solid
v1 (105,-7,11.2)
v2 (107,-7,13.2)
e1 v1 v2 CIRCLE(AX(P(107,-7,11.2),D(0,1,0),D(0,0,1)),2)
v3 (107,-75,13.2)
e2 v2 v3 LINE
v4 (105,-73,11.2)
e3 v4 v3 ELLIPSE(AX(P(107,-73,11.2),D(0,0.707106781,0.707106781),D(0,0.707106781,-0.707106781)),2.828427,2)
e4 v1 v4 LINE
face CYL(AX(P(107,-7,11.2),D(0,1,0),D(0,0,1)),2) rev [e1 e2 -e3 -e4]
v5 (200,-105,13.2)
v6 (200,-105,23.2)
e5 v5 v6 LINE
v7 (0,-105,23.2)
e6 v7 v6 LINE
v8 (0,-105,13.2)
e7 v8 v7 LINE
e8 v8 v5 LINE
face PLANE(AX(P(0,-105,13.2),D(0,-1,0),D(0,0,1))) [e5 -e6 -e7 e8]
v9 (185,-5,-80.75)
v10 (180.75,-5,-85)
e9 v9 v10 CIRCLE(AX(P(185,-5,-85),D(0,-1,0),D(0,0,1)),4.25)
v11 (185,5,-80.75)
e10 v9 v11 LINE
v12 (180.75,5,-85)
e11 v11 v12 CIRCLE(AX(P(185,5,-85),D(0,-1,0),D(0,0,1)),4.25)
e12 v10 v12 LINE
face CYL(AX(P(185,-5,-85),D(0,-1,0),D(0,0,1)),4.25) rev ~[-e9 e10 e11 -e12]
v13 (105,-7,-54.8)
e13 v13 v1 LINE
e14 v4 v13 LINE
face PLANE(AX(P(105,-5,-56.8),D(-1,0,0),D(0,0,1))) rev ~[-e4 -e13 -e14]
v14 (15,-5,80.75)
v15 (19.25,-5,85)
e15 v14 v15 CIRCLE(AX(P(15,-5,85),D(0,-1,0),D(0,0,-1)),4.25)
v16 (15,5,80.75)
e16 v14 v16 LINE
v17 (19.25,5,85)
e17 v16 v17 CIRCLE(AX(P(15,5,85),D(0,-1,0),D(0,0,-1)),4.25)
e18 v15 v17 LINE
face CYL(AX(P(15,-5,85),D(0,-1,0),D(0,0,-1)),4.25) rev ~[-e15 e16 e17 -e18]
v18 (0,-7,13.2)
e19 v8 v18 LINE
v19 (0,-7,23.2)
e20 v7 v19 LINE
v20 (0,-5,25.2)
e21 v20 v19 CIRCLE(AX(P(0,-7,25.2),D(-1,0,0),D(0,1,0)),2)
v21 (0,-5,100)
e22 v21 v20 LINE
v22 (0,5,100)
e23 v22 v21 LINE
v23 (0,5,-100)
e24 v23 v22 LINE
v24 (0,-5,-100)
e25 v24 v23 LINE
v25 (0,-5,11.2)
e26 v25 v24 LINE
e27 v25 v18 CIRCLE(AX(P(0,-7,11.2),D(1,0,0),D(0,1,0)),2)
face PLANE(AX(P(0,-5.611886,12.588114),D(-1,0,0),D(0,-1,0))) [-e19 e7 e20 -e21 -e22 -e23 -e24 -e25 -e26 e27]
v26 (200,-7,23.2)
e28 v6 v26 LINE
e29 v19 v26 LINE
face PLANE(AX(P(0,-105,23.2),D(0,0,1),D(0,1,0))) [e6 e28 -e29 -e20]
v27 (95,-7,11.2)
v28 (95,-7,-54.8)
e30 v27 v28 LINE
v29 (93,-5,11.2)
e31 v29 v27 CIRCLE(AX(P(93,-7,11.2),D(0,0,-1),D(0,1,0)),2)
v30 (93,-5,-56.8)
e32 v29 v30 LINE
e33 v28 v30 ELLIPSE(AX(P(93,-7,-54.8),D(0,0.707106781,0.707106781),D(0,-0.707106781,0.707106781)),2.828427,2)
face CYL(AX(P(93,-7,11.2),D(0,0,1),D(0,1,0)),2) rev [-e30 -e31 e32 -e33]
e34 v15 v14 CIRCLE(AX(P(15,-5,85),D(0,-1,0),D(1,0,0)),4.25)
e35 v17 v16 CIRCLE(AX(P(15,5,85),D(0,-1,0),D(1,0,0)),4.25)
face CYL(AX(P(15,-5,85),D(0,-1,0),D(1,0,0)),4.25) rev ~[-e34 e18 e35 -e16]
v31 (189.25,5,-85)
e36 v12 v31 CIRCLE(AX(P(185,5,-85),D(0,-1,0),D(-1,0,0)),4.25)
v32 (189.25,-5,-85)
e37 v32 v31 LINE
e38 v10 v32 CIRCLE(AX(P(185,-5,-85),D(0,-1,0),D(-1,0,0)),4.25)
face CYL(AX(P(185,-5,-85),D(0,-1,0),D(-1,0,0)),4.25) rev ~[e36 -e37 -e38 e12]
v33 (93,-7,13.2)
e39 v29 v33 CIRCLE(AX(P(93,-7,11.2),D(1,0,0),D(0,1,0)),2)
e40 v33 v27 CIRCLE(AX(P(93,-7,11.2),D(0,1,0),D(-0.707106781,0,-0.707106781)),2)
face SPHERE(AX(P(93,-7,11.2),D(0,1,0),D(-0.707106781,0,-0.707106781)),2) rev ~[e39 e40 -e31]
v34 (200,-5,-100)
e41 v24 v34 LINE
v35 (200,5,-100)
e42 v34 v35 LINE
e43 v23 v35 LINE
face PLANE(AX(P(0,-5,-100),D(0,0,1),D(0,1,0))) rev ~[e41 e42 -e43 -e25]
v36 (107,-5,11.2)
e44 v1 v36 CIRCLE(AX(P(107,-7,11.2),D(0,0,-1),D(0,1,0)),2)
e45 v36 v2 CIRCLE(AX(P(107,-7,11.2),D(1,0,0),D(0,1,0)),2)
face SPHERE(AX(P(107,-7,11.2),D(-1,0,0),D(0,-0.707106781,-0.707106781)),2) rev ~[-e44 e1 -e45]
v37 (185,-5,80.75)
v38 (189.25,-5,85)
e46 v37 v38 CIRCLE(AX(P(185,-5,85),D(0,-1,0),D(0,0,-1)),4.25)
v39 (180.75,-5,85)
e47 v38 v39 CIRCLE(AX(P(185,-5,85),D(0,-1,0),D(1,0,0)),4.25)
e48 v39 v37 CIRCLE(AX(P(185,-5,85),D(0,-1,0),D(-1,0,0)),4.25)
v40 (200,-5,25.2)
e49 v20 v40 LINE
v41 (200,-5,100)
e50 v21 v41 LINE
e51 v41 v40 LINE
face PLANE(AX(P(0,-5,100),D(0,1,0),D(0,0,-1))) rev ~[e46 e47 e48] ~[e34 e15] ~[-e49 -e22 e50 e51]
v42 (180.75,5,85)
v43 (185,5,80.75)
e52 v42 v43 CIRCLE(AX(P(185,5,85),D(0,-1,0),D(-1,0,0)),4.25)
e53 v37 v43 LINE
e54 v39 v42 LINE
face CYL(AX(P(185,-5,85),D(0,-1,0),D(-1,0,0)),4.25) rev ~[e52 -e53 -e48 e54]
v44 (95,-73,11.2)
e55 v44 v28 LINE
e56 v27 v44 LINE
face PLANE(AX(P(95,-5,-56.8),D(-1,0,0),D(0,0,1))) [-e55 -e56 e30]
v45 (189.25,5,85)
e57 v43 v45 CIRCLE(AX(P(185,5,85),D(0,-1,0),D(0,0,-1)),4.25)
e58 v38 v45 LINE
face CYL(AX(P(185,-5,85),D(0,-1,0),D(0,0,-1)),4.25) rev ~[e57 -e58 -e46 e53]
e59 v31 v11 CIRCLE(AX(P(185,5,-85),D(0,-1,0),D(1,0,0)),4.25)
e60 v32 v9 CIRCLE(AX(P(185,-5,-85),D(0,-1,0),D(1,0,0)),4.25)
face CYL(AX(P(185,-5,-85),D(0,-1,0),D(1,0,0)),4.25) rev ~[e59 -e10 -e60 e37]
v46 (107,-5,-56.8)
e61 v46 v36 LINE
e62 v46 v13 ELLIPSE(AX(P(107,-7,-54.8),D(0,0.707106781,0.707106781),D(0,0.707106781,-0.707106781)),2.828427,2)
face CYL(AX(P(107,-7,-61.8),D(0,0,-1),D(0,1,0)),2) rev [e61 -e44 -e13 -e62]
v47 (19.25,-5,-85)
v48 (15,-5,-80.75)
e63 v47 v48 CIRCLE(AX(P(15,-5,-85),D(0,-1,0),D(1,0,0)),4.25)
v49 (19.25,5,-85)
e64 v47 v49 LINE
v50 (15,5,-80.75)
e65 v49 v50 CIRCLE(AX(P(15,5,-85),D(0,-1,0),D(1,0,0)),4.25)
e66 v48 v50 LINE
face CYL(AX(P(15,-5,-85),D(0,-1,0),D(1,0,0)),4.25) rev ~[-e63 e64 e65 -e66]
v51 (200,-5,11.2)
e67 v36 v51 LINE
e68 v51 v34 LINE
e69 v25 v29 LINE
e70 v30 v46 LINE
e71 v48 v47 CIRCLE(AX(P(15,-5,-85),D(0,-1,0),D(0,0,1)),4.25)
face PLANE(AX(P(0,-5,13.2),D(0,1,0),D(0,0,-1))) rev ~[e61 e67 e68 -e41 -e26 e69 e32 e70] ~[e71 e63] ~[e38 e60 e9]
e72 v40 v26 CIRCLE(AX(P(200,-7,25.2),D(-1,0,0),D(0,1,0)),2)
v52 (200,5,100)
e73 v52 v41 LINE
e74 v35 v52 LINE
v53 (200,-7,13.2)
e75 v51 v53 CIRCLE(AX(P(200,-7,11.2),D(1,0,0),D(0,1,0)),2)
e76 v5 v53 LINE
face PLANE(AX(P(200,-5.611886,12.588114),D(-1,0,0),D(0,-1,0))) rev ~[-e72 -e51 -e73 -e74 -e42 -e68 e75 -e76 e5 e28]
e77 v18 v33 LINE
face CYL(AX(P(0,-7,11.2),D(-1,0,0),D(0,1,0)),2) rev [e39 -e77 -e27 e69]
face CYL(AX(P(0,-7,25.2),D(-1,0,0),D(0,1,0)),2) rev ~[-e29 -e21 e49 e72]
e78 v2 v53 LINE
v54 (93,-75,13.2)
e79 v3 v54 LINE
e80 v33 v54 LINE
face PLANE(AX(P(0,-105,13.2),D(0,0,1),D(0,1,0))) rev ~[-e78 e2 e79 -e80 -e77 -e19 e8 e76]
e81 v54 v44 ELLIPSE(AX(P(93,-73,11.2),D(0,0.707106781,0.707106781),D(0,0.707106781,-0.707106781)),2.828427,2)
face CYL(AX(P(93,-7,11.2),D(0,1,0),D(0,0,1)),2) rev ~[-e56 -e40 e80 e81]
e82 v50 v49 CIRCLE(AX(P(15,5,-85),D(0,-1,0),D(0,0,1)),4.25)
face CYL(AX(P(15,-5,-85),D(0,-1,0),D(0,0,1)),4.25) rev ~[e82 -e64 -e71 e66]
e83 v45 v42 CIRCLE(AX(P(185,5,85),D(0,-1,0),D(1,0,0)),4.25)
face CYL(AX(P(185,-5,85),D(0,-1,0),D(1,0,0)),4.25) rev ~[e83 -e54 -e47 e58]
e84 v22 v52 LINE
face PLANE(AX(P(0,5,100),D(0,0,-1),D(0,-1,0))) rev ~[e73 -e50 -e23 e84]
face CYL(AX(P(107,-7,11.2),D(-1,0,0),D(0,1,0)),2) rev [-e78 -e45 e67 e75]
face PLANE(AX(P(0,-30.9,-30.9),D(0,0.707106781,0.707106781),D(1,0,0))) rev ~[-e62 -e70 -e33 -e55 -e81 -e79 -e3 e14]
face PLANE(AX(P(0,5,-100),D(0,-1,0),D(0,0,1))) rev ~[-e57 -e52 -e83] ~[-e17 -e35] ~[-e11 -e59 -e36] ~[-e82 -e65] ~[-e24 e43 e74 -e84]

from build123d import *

# Parameters (mm, degrees)
F0_W         = 100
F0_H         = 10
F1_DEPTH     = 200
F2_W         = 10
F2_H         = 70
F3_DEPTH     = 70
F5_DEPTH     = 70
F7_DEPTH     = 20
F8_T1_DEPTH  = 200
F8_T3_DEPTH  = 93
F8_T5_DEPTH  = 93
F8_S9_W      = 2
F8_S9_H      = 2
F8_T10_DEPTH = 2
F8_S15_W     = 2
F8_S15_H     = 2
F8_T16_DEPTH = 2
F8_T22_DEPTH = 73
F8_T27_DEPTH = 73
F8_T32_DEPTH = 73
F8_T37_DEPTH = 73


# Not quite as in the source:
# - a fillet or chamfer that OpenCascade refuses, or shapes differently, is made with other operations: its cross-section is extruded or revolved along the edge and cut away or added


with BuildPart() as f1:
    # F0 (on Right) → F1 (new body)
    with BuildSketch(Plane.YZ):
        Polygon((5, -100), (5, 100), (-5, 100), (-5, 23.2), (-5, 13.2), (-5, -100), align=None)
        with Locations((-55, 18.2)):
            Rectangle(F0_W, F0_H)
    extrude(amount=F1_DEPTH)

    # F2 (on face) → F3 (join)
    with BuildSketch(Plane.XZ.offset(5)):
        with Locations((100, -21.8)):
            Rectangle(F2_W, F2_H)
    extrude(amount=F3_DEPTH)

    # F4 (on face) → F5 (cut)
    with BuildSketch(Plane(origin=(95, 0, 0), x_dir=(0, -1, 0), z_dir=(-1, 0, 0))):
        Polygon((75, -56.8), (75, 13.2), (5, -56.8), align=None)
    extrude(amount=-F5_DEPTH, mode=Mode.SUBTRACT)

    # F6 (on face) → F7 (cut)
    with BuildSketch(Plane.XZ.offset(5)):
        with BuildLine():
            Line((15, 80.75), (15, 85))
            Line((15, 85), (19.25, 85))
            ThreePointArc((19.25, 85), (11.99479618, 88.00520382), (15, 80.75))
        make_face()
        with BuildLine():
            Line((19.25, 85), (15, 85))
            Line((15, 85), (15, 80.75))
            ThreePointArc((15, 80.75), (18.00520382, 81.99479618), (19.25, 85))
        make_face()
        with BuildLine():
            ThreePointArc((189.25, 85), (185, 89.25), (180.75, 85))
            Line((180.75, 85), (185, 85))
            Line((185, 85), (185, 80.75))
            ThreePointArc((185, 80.75), (188.00520382, 81.99479618), (189.25, 85))
        make_face()
        with BuildLine():
            Line((185, 85), (180.75, 85))
            ThreePointArc((180.75, 85), (181.99479618, 81.99479618), (185, 80.75))
            Line((185, 80.75), (185, 85))
        make_face()
        with BuildLine():
            ThreePointArc((189.25, -85), (188.00520382, -81.99479618), (185, -80.75))
            Line((185, -80.75), (185, -85))
            Line((185, -85), (180.75, -85))
            ThreePointArc((180.75, -85), (185, -89.25), (189.25, -85))
        make_face()
        with BuildLine():
            Line((185, -85), (185, -80.75))
            ThreePointArc((185, -80.75), (181.99479618, -81.99479618), (180.75, -85))
            Line((180.75, -85), (185, -85))
        make_face()
        with BuildLine():
            Line((15, -85), (15, -80.75))
            ThreePointArc((15, -80.75), (11.99479618, -88.00520382), (19.25, -85))
            Line((19.25, -85), (15, -85))
        make_face()
        with BuildLine():
            ThreePointArc((19.25, -85), (18.00520382, -81.99479618), (15, -80.75))
            Line((15, -80.75), (15, -85))
            Line((15, -85), (19.25, -85))
        make_face()
    extrude(amount=-F7_DEPTH, mode=Mode.SUBTRACT)

    # F8: fillet of radius 2 on 7 edges, made by hand

    # F8_s2 → F8_t1 (join)
    with BuildSketch(Plane.YZ):
        with BuildLine():
            ThreePointArc((-5, 25.2), (-5.5857864376, 23.7857864376), (-7, 23.2))
            Line((-7, 23.2), (-5, 23.2))
            Line((-5, 23.2), (-5, 25.2))
        make_face()
    extrude(amount=F8_T1_DEPTH)

    # F8_s4 → F8_t3 (join)
    with BuildSketch(Plane.YZ):
        with BuildLine():
            ThreePointArc((-5, 11.2), (-5.5857864376, 12.6142135624), (-7, 13.2))
            Line((-7, 13.2), (-5, 13.2))
            Line((-5, 13.2), (-5, 11.2))
        make_face()
    extrude(amount=F8_T3_DEPTH)

    # F8_s6 → F8_t5 (join)
    with BuildSketch(Plane.YZ.offset(107)):
        with BuildLine():
            ThreePointArc((-5, 11.2), (-5.5857864376, 12.6142135624), (-7, 13.2))
            Line((-7, 13.2), (-5, 13.2))
            Line((-5, 13.2), (-5, 11.2))
        make_face()
    extrude(amount=F8_T5_DEPTH)


with BuildPart() as f8_tool8:
    # F8_s9 → F8_t10 (new body)
    with BuildSketch(Plane.XZ.offset(7)):
        with Locations((94, 12.2)):
            Rectangle(F8_S9_W, F8_S9_H)
    extrude(amount=-F8_T10_DEPTH)

    # F8_s11 → F8_t12 (revolve, cut)
    with BuildSketch(Plane(origin=(93, -7, 11.2), x_dir=(-0.7071067812, 0, -0.7071067812), z_dir=(0.7071067812, 0, -0.7071067812))):
        with BuildLine():
            ThreePointArc((0, -2), (2, 0), (0, 2))
            Line((0, 2), (0, -2))
        make_face()
    revolve(axis=Axis((93, -7, 11.2), (0, 1, 0)), mode=Mode.SUBTRACT)


with BuildPart() as f1_1:
    add(f1.part)

    # F8_t7: union F8_tool8
    add(f8_tool8.part)


with BuildPart() as f8_tool14:
    # F8_s15 → F8_t16 (new body)
    with BuildSketch(Plane.YZ.offset(107)):
        with Locations((-6, 12.2)):
            Rectangle(F8_S15_W, F8_S15_H)
    extrude(amount=-F8_T16_DEPTH)

    # F8_s17 → F8_t18 (revolve, cut)
    with BuildSketch(Plane(origin=(107, -7, 11.2), x_dir=(0, -0.7071067812, -0.7071067812), z_dir=(0, 0.7071067812, -0.7071067812))):
        with BuildLine():
            ThreePointArc((0, -2), (2, 0), (0, 2))
            Line((0, 2), (0, -2))
        make_face()
    revolve(axis=Axis((107, -7, 11.2), (-1, 0, 0)), mode=Mode.SUBTRACT)


with BuildPart() as f1_2:
    add(f1_1.part)

    # F8_t13: union F8_tool14
    add(f8_tool14.part)


with BuildPart() as f8_tool20:
    # F8_s21 → F8_t22 (new body)
    with BuildSketch(Plane.XY.offset(-61.8)):
        with BuildLine():
            ThreePointArc((107, -5), (105.5857864376, -5.5857864376), (105, -7))
            Line((105, -7), (105, -5))
            Line((105, -5), (107, -5))
        make_face()
    extrude(amount=F8_T22_DEPTH)

    split(bisect_by=Plane(origin=(0, -30.9, -30.9), x_dir=(1, 0, 0), z_dir=(0, 0.7071067812, 0.7071067812)), keep=Keep.TOP)


with BuildPart() as f1_3:
    add(f1_2.part)

    # F8_t19: union F8_tool20
    add(f8_tool20.part)


with BuildPart() as f8_tool25:
    # F8_s26 → F8_t27 (new body)
    with BuildSketch(Plane.XY.offset(11.2)):
        with BuildLine():
            ThreePointArc((93, -5), (94.4142135624, -5.5857864376), (95, -7))
            Line((95, -7), (95, -5))
            Line((95, -5), (93, -5))
        make_face()
    extrude(amount=-F8_T27_DEPTH)

    split(bisect_by=Plane(origin=(0, -30.9, -30.9), x_dir=(1, 0, 0), z_dir=(0, 0.7071067812, 0.7071067812)), keep=Keep.TOP)


with BuildPart() as f1_4:
    add(f1_3.part)

    # F8_t24: union F8_tool25
    add(f8_tool25.part)


with BuildPart() as f8_tool30:
    # F8_s31 → F8_t32 (new body)
    with BuildSketch(Plane.XZ.offset(7)):
        with BuildLine():
            ThreePointArc((93, 13.2), (94.4142135624, 12.6142135624), (95, 11.2))
            Line((95, 11.2), (95, 13.2))
            Line((95, 13.2), (93, 13.2))
        make_face()
    extrude(amount=F8_T32_DEPTH)

    split(bisect_by=Plane(origin=(0, -30.9, -30.9), x_dir=(1, 0, 0), z_dir=(0, 0.7071067812, 0.7071067812)), keep=Keep.TOP)


with BuildPart() as f1_5:
    add(f1_4.part)

    # F8_t29: union F8_tool30
    add(f8_tool30.part)


with BuildPart() as f8_tool35:
    # F8_s36 → F8_t37 (new body)
    with BuildSketch(Plane.XZ.offset(7)):
        with BuildLine():
            ThreePointArc((107, 13.2), (105.5857864376, 12.6142135624), (105, 11.2))
            Line((105, 11.2), (105, 13.2))
            Line((105, 13.2), (107, 13.2))
        make_face()
    extrude(amount=F8_T37_DEPTH)

    split(bisect_by=Plane(origin=(0, -30.9, -30.9), x_dir=(1, 0, 0), z_dir=(0, 0.7071067812, 0.7071067812)), keep=Keep.TOP)


with BuildPart() as f1_6:
    add(f1_5.part)

    # F8_t34: union F8_tool35
    add(f8_tool35.part)


solid = f1_6.part
